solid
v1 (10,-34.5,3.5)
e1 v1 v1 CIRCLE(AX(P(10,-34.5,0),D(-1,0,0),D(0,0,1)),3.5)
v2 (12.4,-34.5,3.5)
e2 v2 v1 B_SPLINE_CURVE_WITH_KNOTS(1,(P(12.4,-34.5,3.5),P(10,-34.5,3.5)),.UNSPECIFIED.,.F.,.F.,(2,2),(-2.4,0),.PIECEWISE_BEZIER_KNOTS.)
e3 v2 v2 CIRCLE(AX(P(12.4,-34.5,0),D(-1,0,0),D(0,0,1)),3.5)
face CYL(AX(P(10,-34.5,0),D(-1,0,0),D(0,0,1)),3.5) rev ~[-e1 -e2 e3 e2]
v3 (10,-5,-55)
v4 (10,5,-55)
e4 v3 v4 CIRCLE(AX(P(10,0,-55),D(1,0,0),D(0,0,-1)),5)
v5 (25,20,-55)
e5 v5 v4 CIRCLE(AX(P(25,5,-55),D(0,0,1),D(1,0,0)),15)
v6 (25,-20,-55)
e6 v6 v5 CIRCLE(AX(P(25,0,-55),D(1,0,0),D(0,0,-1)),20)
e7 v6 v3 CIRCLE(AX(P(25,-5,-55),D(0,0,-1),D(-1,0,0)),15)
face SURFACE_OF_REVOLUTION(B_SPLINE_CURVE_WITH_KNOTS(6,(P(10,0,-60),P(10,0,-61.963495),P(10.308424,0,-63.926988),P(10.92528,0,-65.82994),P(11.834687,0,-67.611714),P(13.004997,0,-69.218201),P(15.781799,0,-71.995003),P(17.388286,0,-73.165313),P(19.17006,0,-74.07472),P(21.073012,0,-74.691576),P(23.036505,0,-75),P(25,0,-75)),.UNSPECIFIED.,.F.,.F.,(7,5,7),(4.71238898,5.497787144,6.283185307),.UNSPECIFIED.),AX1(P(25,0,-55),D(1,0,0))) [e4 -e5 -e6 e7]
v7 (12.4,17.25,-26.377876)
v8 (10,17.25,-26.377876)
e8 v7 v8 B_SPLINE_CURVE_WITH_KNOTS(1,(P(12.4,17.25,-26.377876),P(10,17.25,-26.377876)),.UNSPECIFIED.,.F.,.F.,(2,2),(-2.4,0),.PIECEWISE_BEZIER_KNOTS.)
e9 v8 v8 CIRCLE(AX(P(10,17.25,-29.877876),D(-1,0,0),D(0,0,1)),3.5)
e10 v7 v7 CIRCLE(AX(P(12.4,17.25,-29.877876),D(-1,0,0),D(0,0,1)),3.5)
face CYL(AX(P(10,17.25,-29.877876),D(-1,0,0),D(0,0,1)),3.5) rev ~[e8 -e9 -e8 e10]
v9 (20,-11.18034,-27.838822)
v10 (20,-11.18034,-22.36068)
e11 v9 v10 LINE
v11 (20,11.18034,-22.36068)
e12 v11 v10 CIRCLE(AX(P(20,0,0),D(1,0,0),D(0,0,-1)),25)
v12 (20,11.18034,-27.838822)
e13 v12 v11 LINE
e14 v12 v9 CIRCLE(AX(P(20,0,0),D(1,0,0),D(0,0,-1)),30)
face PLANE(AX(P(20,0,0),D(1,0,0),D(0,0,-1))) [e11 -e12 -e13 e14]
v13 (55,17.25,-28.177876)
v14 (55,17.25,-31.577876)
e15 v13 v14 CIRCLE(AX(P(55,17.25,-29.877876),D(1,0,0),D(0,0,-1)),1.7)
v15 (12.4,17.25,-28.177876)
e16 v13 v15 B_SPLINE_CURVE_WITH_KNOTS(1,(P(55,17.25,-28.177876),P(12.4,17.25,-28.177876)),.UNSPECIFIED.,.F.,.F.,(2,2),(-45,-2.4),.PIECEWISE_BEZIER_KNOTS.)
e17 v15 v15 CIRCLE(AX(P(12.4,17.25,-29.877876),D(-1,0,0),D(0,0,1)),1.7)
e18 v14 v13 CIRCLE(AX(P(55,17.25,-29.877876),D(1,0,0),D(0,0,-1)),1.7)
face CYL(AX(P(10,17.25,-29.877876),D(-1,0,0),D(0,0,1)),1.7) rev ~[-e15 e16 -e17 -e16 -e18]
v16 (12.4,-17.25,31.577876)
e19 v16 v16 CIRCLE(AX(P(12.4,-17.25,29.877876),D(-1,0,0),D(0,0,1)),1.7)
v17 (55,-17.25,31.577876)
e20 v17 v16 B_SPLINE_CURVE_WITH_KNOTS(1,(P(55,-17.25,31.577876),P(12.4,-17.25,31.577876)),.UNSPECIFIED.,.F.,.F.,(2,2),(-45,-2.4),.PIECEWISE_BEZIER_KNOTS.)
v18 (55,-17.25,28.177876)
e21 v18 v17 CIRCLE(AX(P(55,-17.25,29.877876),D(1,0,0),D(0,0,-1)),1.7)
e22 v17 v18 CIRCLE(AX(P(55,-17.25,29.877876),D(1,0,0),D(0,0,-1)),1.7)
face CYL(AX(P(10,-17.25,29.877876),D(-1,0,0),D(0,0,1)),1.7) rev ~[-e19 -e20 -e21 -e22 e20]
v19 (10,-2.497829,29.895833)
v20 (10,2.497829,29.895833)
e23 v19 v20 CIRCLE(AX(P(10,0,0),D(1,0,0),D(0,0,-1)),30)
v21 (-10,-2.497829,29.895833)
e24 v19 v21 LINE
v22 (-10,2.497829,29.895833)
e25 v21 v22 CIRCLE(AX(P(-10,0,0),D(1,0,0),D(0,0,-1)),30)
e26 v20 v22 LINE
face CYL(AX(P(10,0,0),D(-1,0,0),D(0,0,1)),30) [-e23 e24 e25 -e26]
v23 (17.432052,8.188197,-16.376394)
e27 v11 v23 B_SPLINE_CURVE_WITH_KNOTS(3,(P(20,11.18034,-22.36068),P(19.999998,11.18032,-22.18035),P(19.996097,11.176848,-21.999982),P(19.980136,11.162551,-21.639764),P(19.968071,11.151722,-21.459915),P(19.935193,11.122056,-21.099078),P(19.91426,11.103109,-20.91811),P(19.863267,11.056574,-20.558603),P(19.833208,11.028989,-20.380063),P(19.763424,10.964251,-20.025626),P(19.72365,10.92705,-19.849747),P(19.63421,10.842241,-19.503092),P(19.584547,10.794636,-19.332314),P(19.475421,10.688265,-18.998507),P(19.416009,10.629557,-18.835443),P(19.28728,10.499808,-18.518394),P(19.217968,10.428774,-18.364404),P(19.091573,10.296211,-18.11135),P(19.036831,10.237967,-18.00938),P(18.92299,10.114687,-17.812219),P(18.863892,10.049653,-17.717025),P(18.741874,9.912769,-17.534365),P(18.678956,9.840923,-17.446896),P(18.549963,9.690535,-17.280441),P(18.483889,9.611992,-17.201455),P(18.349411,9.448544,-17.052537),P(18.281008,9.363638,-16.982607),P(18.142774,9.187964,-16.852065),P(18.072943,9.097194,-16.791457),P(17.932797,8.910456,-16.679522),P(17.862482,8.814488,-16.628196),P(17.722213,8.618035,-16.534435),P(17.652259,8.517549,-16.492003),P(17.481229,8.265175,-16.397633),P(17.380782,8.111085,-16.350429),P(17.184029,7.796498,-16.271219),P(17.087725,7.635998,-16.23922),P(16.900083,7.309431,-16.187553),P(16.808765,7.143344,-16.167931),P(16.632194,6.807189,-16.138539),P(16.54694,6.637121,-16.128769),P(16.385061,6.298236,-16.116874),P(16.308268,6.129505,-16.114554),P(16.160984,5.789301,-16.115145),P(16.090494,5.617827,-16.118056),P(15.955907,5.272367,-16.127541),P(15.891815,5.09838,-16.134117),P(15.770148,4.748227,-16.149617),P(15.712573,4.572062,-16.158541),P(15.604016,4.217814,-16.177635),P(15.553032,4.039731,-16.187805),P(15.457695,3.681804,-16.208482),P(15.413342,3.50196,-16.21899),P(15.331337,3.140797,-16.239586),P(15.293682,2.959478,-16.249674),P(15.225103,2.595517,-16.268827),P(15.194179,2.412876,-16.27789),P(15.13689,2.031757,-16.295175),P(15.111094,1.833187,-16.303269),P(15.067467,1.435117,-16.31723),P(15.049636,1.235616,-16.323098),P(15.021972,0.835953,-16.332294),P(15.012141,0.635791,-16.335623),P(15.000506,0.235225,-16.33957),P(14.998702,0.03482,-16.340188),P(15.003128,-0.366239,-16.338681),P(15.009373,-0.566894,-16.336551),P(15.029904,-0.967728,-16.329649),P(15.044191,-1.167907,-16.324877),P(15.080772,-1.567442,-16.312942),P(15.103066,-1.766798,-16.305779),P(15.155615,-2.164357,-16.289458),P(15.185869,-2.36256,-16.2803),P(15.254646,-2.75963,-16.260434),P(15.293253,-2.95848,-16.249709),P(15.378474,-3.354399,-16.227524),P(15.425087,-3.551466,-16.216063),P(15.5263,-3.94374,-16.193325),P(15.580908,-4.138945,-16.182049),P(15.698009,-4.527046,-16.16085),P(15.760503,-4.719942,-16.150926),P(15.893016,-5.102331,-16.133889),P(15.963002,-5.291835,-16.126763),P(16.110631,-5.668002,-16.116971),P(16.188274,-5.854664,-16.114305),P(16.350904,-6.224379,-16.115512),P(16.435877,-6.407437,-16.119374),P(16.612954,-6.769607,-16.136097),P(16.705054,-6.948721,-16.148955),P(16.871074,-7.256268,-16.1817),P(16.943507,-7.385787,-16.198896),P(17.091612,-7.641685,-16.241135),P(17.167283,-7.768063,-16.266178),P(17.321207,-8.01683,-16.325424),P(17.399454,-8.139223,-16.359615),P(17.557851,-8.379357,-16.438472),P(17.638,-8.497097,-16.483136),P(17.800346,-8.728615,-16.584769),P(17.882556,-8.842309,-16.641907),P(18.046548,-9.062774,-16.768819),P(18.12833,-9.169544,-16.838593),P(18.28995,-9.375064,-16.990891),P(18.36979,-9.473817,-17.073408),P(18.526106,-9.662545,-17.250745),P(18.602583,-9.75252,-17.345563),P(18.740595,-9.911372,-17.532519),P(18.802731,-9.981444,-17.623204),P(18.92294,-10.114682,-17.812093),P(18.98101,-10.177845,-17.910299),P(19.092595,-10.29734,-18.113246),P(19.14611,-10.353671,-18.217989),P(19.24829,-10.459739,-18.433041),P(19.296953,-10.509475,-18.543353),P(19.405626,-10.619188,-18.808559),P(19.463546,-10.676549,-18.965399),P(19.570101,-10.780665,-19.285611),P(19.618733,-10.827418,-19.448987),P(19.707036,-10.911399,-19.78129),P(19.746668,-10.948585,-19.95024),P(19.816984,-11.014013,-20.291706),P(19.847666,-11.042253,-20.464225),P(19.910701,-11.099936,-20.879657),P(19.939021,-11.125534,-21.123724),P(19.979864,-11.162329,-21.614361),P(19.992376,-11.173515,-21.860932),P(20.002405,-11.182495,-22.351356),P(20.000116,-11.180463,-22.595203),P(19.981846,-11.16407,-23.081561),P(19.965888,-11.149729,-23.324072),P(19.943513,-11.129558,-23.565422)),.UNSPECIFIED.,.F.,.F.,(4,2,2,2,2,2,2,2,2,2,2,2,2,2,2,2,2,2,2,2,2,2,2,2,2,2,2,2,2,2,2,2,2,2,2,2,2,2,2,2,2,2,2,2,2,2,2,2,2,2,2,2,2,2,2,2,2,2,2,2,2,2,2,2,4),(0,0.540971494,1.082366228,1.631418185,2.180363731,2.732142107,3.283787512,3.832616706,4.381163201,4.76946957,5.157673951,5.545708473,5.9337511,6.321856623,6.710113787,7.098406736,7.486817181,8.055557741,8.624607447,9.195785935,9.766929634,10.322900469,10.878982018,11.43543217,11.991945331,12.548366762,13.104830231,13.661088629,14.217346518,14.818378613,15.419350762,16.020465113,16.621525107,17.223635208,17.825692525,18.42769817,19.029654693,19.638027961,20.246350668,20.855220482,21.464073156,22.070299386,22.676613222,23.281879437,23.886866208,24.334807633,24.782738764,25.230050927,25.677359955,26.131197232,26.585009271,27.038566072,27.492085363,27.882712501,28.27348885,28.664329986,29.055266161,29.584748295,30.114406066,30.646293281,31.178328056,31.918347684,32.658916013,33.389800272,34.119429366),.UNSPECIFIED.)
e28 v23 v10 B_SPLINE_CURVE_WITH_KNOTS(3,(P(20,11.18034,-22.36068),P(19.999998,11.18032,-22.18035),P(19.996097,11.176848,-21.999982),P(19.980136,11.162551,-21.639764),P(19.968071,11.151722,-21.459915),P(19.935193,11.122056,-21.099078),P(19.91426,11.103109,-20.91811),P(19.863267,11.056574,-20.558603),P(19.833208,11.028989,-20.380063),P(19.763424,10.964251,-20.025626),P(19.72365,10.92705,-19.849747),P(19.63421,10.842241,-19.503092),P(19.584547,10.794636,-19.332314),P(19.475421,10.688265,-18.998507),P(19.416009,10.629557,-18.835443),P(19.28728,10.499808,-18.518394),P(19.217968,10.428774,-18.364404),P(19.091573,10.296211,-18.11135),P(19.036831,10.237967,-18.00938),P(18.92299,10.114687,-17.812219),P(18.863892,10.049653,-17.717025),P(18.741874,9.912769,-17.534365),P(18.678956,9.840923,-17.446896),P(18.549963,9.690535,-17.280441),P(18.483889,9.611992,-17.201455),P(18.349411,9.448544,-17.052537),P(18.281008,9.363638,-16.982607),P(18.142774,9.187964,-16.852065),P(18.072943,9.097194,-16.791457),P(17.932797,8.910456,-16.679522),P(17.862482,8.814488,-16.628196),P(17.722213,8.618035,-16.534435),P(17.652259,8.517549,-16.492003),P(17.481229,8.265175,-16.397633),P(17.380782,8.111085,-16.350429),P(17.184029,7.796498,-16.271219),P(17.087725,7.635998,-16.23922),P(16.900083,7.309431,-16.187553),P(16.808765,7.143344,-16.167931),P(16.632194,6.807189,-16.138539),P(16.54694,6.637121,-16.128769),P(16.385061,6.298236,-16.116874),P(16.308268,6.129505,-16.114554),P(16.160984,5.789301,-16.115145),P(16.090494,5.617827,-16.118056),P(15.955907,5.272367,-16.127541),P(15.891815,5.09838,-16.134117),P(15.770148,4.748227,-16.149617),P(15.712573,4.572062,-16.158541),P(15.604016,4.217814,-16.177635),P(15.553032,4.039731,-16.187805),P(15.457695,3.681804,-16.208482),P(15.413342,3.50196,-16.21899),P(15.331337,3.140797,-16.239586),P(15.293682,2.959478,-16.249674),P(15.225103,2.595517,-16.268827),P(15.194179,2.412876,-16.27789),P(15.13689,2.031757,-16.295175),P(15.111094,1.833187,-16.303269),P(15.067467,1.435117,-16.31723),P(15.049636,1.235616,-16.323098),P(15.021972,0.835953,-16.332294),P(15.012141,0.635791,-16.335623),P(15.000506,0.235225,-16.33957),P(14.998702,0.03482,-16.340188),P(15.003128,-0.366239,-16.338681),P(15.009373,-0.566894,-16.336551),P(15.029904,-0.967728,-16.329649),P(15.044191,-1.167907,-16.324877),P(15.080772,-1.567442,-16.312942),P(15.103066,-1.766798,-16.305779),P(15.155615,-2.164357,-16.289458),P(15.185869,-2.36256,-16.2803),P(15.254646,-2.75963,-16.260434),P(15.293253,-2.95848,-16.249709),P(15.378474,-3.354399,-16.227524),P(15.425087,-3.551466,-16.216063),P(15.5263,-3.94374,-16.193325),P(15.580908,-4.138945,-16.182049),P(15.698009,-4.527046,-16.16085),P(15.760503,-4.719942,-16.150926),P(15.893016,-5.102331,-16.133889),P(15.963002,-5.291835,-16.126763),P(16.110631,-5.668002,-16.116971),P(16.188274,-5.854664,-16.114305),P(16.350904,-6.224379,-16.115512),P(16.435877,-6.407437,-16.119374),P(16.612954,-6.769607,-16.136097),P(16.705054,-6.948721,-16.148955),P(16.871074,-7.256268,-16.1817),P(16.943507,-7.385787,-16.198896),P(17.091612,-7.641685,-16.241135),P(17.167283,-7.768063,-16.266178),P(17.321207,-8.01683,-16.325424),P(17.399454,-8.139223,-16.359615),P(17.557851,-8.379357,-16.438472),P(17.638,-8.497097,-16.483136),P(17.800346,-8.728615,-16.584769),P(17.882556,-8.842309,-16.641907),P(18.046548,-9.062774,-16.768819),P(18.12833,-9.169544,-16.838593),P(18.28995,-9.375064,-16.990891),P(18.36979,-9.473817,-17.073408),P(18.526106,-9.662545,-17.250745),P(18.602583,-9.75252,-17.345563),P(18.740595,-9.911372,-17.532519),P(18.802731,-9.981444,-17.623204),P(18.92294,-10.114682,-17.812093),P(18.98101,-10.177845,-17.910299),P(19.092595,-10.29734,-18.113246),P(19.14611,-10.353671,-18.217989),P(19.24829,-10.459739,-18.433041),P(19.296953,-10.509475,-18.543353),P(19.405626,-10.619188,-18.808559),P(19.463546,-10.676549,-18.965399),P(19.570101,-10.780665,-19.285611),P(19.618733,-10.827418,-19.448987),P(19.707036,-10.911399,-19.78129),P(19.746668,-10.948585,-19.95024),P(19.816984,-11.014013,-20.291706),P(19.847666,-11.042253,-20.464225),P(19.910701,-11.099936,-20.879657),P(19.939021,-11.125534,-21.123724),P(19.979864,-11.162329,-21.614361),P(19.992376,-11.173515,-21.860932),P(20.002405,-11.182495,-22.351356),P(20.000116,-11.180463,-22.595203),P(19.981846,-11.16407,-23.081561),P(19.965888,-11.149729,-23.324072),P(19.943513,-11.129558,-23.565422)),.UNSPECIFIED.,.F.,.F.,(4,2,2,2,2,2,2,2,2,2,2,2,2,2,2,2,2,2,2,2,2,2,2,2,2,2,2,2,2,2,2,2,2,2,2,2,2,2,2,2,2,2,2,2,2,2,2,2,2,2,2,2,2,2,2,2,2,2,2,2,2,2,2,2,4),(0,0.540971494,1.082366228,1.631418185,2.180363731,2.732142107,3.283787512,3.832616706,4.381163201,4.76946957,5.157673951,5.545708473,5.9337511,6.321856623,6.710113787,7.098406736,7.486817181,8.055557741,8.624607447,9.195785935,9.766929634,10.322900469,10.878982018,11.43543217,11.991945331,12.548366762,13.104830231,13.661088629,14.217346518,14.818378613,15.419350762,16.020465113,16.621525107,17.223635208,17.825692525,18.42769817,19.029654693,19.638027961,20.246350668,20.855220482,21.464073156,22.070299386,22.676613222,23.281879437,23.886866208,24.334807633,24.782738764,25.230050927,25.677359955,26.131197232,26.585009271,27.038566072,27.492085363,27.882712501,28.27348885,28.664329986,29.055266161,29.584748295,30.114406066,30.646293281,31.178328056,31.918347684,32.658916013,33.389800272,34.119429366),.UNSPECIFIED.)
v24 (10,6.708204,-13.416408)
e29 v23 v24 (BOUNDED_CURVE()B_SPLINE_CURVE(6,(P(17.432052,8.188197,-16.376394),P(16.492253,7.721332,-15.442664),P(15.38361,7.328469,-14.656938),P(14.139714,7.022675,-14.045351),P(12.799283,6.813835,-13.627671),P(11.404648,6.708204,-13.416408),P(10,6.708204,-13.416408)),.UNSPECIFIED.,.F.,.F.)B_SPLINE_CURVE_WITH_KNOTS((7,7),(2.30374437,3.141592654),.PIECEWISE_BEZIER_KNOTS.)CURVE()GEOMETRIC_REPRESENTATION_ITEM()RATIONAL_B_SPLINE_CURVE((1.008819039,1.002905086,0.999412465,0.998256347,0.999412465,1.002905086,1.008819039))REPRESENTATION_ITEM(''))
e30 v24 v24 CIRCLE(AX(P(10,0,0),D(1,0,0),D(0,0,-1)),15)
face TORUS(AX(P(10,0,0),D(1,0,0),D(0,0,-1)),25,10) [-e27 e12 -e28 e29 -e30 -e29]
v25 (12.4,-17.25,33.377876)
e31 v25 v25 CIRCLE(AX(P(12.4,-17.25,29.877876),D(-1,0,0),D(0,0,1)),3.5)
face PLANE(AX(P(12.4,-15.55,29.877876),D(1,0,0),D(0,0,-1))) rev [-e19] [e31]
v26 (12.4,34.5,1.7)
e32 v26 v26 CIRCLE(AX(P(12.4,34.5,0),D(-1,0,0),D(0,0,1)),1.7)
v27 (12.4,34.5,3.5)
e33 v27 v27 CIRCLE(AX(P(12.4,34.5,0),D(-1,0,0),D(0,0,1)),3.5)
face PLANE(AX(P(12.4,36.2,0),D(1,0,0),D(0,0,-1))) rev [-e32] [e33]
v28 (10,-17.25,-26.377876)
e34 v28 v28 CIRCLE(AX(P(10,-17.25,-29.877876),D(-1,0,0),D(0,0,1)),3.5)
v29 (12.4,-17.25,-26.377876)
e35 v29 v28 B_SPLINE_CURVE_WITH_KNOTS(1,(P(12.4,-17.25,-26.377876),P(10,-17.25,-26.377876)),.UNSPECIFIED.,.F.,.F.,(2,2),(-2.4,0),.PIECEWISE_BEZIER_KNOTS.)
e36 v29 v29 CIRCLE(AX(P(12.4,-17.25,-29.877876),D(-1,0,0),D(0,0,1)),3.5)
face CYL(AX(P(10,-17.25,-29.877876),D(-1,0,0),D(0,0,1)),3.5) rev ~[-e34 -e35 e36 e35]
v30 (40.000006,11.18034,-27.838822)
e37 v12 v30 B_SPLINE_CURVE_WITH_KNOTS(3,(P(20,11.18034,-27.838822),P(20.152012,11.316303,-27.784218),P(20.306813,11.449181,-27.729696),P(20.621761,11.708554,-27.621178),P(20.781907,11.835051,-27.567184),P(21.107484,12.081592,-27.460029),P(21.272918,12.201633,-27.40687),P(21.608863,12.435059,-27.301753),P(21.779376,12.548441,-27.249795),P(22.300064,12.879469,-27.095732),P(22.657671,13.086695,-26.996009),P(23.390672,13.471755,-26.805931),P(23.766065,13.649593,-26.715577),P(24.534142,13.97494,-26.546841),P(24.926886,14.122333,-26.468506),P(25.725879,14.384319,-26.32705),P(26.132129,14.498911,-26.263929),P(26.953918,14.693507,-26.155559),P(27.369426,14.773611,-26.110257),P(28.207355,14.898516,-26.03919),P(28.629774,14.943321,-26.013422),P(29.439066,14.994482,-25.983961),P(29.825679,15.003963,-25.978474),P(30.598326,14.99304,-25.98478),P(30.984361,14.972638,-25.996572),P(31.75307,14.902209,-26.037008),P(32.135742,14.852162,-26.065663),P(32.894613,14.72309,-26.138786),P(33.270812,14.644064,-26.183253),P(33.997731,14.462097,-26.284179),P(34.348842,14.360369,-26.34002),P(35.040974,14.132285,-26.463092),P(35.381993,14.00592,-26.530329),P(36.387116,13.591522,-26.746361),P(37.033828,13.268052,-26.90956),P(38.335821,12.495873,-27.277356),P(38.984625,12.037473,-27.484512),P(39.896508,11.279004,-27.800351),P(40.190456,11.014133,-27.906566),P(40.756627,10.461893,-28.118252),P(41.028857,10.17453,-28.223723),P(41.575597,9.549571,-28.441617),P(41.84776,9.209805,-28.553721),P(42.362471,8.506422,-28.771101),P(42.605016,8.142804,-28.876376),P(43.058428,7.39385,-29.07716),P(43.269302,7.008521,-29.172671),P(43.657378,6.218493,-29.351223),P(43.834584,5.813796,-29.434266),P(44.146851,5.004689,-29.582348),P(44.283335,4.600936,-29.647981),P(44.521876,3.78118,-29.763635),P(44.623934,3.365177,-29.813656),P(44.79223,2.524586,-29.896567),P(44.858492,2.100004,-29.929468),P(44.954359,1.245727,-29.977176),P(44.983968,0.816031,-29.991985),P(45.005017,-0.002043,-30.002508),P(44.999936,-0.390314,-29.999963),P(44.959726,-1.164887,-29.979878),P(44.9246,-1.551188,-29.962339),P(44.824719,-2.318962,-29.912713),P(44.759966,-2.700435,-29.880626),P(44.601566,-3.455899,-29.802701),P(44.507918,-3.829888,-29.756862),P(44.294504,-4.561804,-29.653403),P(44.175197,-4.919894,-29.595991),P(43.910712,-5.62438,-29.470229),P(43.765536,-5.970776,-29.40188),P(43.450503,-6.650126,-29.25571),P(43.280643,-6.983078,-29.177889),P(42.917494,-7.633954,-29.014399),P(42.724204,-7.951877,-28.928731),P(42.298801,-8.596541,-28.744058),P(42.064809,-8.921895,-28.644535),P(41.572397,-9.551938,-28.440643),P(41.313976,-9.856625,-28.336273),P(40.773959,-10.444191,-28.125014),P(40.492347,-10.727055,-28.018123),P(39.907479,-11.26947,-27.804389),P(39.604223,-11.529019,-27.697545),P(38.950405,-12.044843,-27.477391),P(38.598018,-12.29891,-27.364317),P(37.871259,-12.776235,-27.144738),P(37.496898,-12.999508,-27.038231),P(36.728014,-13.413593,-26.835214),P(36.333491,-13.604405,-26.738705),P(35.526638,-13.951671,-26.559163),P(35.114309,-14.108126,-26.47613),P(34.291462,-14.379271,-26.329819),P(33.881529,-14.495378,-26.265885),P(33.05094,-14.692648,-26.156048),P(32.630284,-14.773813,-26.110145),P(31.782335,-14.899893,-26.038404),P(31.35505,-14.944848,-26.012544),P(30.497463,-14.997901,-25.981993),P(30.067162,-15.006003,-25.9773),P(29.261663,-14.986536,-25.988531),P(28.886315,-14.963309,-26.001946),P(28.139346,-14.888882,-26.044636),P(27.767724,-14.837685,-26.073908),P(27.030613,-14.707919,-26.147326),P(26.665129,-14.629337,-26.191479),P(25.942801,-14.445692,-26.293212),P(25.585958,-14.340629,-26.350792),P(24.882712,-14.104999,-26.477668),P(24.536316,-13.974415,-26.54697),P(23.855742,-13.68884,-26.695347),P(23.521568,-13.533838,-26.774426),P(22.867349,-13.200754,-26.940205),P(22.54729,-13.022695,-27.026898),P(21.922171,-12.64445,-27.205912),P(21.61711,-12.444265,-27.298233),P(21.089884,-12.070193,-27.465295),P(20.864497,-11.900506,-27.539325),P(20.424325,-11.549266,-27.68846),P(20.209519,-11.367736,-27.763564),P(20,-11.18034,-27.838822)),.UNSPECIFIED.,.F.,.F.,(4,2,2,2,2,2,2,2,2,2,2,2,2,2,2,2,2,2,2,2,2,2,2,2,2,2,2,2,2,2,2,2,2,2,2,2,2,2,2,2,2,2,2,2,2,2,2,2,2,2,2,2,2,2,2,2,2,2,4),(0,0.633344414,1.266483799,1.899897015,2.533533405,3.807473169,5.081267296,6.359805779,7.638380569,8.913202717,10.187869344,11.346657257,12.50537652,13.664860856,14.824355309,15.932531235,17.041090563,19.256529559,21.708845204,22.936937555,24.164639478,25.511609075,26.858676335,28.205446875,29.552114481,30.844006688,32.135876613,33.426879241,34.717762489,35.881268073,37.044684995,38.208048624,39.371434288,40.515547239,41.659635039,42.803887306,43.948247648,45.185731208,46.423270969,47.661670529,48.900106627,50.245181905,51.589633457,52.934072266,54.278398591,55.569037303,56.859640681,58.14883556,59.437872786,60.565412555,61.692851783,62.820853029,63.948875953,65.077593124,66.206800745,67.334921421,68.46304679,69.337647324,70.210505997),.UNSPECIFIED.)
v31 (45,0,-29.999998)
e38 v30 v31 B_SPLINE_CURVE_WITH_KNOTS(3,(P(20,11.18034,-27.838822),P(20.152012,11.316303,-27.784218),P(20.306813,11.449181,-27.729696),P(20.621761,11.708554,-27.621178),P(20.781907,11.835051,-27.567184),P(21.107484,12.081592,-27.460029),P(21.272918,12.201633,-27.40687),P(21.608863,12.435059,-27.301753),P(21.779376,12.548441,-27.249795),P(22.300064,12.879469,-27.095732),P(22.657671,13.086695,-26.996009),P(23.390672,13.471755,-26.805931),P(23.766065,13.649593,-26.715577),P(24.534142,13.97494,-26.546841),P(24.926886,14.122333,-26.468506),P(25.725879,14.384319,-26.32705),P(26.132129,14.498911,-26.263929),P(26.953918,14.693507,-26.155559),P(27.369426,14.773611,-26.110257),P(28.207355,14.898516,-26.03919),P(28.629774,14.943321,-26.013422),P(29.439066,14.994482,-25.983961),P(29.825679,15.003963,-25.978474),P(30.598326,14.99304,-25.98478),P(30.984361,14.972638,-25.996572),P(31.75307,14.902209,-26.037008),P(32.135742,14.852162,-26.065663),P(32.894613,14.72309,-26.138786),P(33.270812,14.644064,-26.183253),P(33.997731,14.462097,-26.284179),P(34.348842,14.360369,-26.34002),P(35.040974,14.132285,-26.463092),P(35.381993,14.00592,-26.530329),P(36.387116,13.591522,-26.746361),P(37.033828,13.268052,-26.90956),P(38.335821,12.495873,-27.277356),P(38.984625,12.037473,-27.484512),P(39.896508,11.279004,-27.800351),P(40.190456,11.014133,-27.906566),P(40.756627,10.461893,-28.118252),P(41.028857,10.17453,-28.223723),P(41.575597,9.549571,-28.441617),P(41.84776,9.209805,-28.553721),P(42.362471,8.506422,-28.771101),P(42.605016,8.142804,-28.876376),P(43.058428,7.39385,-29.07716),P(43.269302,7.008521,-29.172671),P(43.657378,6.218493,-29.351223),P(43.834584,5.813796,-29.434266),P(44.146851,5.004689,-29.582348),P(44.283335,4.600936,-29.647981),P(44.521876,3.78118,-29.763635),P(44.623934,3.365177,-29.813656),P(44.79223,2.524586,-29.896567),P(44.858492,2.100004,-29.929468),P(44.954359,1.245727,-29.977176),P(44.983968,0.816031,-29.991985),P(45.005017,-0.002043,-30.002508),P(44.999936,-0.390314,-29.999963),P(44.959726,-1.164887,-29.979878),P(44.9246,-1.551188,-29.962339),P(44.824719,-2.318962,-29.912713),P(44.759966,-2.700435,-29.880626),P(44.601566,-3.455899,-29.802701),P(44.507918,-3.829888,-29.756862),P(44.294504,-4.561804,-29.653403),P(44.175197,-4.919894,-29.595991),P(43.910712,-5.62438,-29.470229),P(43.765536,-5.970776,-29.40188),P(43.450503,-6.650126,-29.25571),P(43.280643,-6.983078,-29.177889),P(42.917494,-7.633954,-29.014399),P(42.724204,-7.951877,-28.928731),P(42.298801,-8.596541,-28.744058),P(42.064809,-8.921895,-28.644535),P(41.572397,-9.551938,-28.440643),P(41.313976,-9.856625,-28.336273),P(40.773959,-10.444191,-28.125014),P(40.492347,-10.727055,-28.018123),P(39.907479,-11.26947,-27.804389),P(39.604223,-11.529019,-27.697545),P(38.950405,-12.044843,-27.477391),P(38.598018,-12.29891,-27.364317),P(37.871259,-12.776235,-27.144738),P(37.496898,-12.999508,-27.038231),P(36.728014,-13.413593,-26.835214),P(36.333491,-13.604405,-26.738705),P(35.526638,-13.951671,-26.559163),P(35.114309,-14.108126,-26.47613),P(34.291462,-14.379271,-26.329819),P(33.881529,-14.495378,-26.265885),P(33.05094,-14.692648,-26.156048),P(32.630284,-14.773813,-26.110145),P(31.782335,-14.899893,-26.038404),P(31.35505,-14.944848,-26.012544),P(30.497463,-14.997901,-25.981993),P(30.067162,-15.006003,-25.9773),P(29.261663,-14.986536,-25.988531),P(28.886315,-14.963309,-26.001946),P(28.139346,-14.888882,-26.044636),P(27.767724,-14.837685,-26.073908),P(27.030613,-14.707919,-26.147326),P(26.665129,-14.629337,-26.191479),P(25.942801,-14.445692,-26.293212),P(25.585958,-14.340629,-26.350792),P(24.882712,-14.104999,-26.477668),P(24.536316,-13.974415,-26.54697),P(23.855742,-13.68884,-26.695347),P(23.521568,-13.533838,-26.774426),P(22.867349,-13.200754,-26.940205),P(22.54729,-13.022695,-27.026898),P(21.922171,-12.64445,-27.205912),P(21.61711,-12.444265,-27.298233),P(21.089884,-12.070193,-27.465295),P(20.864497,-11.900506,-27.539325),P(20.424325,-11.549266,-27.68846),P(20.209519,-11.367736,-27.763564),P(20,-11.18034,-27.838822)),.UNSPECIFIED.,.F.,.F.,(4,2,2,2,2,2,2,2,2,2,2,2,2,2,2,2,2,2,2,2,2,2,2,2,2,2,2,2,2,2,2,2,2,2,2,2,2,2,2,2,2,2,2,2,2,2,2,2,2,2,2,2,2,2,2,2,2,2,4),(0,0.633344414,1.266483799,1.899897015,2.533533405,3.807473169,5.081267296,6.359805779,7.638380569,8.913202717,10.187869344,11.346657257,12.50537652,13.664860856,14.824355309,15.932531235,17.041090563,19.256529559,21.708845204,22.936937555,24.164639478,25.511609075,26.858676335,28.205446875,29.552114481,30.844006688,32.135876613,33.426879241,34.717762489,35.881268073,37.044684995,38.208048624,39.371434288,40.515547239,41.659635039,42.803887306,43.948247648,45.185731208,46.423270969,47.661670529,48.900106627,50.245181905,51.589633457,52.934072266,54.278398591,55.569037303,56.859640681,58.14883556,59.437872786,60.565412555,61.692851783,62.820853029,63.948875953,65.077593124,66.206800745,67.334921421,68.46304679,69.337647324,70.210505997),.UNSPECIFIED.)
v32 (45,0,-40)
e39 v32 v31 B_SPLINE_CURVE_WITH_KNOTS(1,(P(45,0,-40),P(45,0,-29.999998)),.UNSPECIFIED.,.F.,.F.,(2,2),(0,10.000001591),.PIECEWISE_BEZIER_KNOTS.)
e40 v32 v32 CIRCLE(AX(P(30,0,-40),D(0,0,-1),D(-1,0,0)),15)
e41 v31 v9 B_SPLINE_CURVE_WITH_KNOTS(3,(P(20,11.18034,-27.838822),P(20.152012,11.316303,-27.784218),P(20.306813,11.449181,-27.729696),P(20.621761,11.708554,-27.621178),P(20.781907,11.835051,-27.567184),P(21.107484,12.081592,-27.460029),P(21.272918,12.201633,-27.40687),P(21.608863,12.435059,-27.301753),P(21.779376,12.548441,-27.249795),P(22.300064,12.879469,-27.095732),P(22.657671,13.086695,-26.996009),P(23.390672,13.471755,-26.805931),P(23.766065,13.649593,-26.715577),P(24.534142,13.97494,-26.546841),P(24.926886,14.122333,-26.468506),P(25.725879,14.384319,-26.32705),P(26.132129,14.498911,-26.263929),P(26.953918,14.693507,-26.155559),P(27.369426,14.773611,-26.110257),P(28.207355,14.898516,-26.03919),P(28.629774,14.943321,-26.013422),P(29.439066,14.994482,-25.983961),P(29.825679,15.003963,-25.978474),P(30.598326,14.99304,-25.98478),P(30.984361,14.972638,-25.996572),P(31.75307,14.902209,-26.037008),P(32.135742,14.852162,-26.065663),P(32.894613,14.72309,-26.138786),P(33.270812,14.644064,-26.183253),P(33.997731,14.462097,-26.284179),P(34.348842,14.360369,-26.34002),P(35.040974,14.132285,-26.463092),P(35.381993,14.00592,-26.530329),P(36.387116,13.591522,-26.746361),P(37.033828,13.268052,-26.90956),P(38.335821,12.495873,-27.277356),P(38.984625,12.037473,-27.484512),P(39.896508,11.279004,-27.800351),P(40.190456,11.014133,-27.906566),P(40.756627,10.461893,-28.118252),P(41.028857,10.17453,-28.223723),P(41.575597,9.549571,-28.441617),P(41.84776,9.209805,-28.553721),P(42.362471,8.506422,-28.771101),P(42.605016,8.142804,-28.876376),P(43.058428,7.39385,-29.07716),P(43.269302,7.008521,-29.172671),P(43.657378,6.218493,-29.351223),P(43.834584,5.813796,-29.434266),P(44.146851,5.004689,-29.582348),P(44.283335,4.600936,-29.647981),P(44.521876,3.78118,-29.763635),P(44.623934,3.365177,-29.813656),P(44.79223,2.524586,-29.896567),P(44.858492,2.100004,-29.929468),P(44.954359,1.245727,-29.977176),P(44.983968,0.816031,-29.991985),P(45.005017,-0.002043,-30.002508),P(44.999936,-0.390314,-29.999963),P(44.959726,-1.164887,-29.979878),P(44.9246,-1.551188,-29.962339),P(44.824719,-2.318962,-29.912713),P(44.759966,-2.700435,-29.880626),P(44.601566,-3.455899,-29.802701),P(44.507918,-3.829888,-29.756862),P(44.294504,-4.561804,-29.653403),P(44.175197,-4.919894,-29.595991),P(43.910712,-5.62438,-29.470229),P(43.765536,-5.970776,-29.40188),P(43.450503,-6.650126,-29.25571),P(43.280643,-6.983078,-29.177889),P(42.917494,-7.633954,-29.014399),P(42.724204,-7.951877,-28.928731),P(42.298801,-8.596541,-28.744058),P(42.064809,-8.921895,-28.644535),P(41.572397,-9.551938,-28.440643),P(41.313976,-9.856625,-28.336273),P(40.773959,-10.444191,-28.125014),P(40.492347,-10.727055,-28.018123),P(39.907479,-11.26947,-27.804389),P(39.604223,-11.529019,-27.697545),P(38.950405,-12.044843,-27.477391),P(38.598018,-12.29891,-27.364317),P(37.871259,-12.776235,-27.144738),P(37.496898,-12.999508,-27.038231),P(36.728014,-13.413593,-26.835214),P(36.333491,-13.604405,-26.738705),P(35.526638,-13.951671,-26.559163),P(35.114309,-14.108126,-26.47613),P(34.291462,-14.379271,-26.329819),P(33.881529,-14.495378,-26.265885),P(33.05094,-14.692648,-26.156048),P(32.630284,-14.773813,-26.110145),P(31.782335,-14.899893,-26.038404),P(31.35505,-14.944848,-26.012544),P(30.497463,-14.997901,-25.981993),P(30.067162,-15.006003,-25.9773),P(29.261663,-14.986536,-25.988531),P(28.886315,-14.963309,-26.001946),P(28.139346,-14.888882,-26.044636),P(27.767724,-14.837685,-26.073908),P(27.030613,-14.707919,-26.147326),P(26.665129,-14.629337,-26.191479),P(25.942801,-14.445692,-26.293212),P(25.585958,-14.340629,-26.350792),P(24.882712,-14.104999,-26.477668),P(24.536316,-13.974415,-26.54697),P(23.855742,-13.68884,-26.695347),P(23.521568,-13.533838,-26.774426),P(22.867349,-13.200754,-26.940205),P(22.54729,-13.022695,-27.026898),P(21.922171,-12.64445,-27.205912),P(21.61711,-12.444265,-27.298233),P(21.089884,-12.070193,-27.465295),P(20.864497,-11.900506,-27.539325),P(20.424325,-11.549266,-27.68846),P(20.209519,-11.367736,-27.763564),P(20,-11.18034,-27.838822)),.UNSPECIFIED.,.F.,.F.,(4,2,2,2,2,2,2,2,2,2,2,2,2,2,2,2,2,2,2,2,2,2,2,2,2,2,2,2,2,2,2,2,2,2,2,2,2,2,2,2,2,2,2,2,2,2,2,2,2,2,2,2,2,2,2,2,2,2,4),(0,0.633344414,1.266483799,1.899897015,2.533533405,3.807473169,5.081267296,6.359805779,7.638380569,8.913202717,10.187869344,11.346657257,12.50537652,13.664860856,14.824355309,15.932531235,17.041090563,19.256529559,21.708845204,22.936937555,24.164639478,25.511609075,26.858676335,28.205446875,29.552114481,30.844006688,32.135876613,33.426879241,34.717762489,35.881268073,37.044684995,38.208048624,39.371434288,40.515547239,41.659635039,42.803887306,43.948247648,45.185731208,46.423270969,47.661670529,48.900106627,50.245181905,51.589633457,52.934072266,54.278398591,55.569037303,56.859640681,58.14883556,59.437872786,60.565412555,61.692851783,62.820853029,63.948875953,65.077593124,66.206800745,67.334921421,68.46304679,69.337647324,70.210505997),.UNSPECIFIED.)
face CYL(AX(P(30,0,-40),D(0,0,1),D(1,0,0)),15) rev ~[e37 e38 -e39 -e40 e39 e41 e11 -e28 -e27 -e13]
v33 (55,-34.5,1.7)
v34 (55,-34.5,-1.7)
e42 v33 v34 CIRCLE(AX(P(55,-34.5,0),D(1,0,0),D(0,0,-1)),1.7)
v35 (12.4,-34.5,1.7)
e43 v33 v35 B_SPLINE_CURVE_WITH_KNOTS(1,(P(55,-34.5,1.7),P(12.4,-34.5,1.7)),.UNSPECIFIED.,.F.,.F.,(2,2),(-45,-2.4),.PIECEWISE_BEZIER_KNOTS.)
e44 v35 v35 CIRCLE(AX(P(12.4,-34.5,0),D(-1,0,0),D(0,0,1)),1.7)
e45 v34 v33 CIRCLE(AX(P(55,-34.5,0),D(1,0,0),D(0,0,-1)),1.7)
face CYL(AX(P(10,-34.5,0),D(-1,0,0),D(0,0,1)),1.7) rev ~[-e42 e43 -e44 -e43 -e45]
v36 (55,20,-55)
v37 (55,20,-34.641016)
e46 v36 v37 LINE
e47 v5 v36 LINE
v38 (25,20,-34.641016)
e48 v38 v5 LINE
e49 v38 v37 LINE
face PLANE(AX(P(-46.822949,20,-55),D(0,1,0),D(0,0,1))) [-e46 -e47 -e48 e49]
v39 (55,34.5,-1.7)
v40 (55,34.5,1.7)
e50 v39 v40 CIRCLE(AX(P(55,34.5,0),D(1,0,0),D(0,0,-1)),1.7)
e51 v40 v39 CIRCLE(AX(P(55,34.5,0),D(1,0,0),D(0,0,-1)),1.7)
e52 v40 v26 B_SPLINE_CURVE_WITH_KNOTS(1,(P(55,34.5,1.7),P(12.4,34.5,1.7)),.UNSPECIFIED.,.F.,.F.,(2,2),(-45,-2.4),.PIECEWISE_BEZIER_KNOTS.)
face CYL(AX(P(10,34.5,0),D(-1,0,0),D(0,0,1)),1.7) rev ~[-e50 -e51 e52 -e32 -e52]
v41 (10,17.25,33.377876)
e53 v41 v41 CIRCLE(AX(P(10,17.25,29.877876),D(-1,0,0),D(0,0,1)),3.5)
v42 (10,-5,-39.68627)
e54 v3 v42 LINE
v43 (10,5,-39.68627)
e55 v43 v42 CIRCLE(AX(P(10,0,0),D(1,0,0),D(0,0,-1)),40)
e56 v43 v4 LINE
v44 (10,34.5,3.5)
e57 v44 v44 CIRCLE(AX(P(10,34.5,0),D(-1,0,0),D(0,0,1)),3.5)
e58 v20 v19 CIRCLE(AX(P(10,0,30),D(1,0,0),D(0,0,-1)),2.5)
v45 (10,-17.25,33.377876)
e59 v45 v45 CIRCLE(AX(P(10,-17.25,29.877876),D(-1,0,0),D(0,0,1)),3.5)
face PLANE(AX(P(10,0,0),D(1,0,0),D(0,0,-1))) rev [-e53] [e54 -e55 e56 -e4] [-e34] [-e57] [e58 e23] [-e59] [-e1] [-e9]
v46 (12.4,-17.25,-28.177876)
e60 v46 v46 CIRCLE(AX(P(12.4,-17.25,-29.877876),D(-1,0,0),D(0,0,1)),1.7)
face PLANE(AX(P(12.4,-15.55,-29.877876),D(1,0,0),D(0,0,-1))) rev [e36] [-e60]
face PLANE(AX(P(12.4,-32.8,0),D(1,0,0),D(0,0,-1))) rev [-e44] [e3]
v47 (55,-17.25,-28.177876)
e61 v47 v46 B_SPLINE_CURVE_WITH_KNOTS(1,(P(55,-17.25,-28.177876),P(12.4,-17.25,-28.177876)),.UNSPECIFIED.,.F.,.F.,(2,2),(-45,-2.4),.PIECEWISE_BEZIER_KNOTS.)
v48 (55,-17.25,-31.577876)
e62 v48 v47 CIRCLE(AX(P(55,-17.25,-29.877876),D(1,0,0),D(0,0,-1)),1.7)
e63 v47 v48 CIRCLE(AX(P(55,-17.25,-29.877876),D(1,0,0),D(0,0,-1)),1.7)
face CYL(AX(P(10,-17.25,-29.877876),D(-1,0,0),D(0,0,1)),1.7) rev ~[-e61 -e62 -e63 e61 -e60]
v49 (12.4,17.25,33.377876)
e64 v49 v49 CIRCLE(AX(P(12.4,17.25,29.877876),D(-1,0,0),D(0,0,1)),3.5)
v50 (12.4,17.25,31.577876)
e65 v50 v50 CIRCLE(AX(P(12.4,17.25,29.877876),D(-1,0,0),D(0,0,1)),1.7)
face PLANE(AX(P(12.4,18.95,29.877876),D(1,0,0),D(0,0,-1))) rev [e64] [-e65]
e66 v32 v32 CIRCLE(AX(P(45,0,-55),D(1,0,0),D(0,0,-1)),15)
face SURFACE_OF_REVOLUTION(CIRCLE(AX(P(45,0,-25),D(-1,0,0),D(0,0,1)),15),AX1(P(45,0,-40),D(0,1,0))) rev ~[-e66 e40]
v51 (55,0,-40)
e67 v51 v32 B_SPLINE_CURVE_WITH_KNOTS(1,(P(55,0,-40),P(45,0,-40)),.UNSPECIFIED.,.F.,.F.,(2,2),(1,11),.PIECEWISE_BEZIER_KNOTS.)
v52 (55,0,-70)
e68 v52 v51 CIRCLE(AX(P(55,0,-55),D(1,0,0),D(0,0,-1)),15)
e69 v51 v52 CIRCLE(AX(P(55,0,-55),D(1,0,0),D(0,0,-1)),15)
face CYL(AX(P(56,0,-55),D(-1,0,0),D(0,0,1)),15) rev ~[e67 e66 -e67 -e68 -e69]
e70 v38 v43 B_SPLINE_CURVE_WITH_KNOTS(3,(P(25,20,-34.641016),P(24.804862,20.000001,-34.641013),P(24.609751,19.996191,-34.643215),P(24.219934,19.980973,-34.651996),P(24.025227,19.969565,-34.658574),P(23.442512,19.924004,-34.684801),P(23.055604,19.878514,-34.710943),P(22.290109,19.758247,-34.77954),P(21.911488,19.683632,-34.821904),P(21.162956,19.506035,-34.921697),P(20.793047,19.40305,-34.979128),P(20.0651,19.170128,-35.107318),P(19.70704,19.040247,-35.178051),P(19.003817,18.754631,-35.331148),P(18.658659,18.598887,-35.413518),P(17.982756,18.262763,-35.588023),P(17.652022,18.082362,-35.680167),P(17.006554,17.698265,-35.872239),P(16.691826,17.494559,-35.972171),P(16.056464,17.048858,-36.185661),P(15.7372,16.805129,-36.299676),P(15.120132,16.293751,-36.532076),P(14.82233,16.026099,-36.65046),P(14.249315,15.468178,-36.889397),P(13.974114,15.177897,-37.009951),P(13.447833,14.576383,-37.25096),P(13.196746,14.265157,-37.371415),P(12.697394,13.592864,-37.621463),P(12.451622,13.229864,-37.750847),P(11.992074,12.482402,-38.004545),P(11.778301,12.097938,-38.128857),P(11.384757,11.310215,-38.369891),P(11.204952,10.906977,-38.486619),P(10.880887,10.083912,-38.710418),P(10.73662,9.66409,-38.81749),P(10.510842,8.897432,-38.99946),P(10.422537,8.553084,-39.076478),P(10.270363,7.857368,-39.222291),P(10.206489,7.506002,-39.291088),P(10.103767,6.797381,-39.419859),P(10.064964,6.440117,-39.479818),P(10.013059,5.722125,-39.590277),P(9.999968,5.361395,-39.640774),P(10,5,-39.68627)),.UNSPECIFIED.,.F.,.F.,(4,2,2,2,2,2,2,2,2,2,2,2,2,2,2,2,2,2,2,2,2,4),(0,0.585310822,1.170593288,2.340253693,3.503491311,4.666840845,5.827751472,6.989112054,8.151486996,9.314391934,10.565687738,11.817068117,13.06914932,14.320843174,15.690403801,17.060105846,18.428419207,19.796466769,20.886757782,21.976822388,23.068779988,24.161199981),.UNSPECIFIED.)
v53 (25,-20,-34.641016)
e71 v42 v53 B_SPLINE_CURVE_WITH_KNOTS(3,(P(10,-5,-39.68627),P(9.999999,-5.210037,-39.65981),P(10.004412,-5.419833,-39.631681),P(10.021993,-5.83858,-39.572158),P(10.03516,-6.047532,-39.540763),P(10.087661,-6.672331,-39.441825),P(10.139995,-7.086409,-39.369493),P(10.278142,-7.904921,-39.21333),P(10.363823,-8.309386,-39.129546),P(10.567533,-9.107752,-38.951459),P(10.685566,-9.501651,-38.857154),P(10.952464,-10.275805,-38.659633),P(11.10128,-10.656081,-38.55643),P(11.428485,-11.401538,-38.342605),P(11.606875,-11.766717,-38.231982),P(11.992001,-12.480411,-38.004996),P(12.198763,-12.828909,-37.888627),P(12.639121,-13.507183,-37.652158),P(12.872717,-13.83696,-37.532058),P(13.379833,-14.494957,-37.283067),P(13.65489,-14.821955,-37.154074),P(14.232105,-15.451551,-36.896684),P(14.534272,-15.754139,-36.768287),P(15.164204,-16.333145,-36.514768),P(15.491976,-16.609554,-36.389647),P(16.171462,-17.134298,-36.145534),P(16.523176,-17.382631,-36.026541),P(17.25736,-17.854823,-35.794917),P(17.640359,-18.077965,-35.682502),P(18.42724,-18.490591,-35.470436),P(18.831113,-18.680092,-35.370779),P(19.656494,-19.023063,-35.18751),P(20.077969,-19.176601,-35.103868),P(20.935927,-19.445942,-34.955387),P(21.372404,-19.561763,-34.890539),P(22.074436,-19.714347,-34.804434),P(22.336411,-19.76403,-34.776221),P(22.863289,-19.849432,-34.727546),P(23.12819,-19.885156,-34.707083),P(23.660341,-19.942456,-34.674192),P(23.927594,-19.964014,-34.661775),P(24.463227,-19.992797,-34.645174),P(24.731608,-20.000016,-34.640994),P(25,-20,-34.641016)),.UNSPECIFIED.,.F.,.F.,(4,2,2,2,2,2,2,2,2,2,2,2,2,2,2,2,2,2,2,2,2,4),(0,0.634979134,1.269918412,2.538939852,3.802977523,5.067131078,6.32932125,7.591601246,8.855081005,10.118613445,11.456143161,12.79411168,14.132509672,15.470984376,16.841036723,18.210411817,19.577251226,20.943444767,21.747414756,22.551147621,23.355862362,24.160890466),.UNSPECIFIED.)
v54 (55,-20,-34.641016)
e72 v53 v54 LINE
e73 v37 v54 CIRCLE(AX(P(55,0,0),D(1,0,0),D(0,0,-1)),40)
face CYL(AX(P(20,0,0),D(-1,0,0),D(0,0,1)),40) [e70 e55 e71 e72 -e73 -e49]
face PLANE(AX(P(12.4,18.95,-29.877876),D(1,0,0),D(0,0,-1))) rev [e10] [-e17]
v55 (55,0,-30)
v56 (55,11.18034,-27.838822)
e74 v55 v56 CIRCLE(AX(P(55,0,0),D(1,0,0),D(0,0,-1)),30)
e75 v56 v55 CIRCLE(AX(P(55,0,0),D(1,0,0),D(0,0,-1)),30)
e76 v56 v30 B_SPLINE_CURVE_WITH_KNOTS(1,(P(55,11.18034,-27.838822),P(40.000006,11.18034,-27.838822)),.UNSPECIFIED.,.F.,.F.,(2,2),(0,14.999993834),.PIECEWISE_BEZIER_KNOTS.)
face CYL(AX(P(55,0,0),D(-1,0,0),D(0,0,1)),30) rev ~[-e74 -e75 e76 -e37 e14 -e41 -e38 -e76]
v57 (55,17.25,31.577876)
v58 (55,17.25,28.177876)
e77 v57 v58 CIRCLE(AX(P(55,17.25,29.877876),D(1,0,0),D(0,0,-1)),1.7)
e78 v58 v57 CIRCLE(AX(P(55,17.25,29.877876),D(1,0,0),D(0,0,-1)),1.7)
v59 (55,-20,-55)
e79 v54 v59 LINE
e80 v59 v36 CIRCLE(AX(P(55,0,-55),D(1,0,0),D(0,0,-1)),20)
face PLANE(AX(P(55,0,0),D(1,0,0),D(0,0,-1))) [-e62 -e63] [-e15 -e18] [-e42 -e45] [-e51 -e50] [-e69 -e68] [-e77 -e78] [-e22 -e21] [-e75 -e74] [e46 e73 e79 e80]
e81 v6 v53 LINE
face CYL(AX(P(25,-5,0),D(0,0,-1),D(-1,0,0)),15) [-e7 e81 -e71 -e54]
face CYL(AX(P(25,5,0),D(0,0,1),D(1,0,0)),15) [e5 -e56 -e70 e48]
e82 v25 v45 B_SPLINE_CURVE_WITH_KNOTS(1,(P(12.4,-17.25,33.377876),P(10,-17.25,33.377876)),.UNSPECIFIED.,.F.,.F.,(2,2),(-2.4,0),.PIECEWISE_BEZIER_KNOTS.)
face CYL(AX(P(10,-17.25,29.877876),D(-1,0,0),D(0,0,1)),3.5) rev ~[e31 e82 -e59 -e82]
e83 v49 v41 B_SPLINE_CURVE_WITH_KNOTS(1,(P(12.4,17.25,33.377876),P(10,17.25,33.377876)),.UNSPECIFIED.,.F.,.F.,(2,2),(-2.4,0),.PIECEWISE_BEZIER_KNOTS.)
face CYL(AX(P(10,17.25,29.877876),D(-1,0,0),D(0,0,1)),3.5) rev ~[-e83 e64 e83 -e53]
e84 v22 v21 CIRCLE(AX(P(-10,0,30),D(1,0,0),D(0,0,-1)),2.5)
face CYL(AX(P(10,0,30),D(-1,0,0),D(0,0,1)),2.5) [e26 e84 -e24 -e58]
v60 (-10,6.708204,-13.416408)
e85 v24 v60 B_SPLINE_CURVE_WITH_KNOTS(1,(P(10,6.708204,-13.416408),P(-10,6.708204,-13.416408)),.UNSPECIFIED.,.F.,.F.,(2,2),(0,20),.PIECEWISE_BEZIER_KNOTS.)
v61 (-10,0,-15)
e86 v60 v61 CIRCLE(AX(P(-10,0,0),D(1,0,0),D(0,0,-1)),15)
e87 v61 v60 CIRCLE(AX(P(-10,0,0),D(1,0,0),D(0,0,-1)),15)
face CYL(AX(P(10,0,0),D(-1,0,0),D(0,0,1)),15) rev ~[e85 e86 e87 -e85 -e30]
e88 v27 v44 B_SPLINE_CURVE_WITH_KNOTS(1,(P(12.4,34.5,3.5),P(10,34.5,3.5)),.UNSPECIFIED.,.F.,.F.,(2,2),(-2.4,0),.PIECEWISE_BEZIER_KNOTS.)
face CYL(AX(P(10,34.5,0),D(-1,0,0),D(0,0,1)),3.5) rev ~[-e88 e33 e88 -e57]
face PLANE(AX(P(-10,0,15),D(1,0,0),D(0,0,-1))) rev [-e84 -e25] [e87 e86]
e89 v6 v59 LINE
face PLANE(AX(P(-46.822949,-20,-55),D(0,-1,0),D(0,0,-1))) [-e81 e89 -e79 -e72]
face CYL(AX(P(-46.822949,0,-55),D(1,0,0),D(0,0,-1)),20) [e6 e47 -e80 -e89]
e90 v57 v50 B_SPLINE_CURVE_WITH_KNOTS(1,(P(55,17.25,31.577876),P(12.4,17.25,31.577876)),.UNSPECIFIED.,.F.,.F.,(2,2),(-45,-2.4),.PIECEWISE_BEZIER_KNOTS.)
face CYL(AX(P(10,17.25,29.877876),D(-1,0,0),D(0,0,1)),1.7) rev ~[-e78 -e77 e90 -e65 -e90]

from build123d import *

# Parameters (mm, degrees)
CROQUIS1_R                                           = 15
SALIENTE_EXTRUIR1_DEPTH                              = 10
CROQUIS2_R                                           = 40
CROQUIS2_R_2                                         = 15
SALIENTE_EXTRUIR2_DEPTH                              = 10
CROQUIS3_R                                           = 40
CROQUIS3_R_2                                         = 30
SALIENTE_EXTRUIR3_DEPTH                              = 35
REFRENTADO_PARA_TORNILLO_CON_CABEZA_TRON_D           = 3.4
REFRENTADO_PARA_TORNILLO_CON_CABEZA_TRON_CBORE_D     = 7
REFRENTADO_PARA_TORNILLO_CON_CABEZA_TRON_CBORE_DEPTH = 2.4
SALIENTE_EXTRUIR4_START                              = -45
SALIENTE_EXTRUIR4_DEPTH                              = 45
REDONDEO1_R                                          = 15
CORTAR_BARRER4_PROFILE_R                             = 15


with BuildPart() as part:
    # Croquis1 → Saliente-Extruir1 (new, symmetric)
    with BuildSketch(Plane(origin=(0, 0, 0), x_dir=(0, 0, -1), z_dir=(1, 0, 0))):
        with BuildLine():
            ThreePointArc((-29.895833333, -2.497828918), (30, 0), (-29.895833333, 2.497828918))
            ThreePointArc((-29.895833333, 2.497828918), (-32.5, 0), (-29.895833333, -2.497828918))
        make_face()
        Circle(CROQUIS1_R, mode=Mode.SUBTRACT)
    extrude(amount=SALIENTE_EXTRUIR1_DEPTH, both=True)

    # Croquis2 → Saliente-Extruir2 (add)
    with BuildSketch(Plane(origin=(10, 0, 0), x_dir=(0, 0, -1), z_dir=(1, 0, 0))):
        Circle(CROQUIS2_R)
        Circle(CROQUIS2_R_2, mode=Mode.SUBTRACT)
    extrude(amount=SALIENTE_EXTRUIR2_DEPTH)

    # Croquis3 → Saliente-Extruir3 (add)
    with BuildSketch(Plane(origin=(20, 0, 0), x_dir=(0, 0, -1), z_dir=(1, 0, 0))):
        Circle(CROQUIS3_R)
        Circle(CROQUIS3_R_2, mode=Mode.SUBTRACT)
    extrude(amount=SALIENTE_EXTRUIR3_DEPTH)

    # Refrentado para tornillo con cabeza troncocónica de M31 (through all)
    with Locations(Plane.ZY.offset(-10)):
        with Locations((0, 34.5), (29.877876431, 17.25), (29.877876431, -17.25), (0, -34.5), (-29.877876431, -17.25), (-29.877876431, 17.25)):
            CounterBoreHole(REFRENTADO_PARA_TORNILLO_CON_CABEZA_TRON_D / 2, REFRENTADO_PARA_TORNILLO_CON_CABEZA_TRON_CBORE_D / 2, REFRENTADO_PARA_TORNILLO_CON_CABEZA_TRON_CBORE_DEPTH)

    # Croquis8 → Saliente-Extruir4 (add)
    with BuildSketch(Plane(origin=(55, 0, 0), x_dir=(0, 0, -1), z_dir=(1, 0, 0)).offset(SALIENTE_EXTRUIR4_START)):
        with BuildLine():
            Line((55, 20), (34.641016151, 20))
            ThreePointArc((34.641016151, 20), (40, 0), (34.641016151, -20))
            Line((34.641016151, -20), (55, -20))
            ThreePointArc((55, -20), (75, 0), (55, 20))
        make_face()
    extrude(amount=SALIENTE_EXTRUIR4_DEPTH)

    # Redondeo1
    redondeo1_edges = [part.edges().sort_by_distance(p)[0] for p in [
        (10, 0, -75),
        (10, -20, -44.820508076),
        (10, 20, -44.820508076),
    ]]
    fillet(redondeo1_edges, radius=REDONDEO1_R)

    # Cortar-Barrer4: sweep along a path in Croquis17
    with BuildLine(Plane(origin=(0, 0, 0), x_dir=(1, 0, 0), z_dir=(0, 1, 0))) as cortar_barrer4_path:
        Line((55, 55), (45, 55))
        ThreePointArc((45, 55), (34.393398282, 50.606601718), (30, 40))
        Line((30, 40), (30, 0))
    # Cortar-Barrer4 profile (on start of the path) → Cortar-Barrer4 (sweep, cut)
    with BuildSketch(Plane(origin=(55, 0, -55), x_dir=(0, 0, -1), z_dir=(-1, 0, 0))):
        Circle(CORTAR_BARRER4_PROFILE_R)
    sweep(path=cortar_barrer4_path.line, mode=Mode.SUBTRACT)

    # Redondeo2: read off the stored shape, not the designer's step
    # Redondeo2 outline → Redondeo2 (revolve, cut)
    with BuildSketch(Plane.YX):
        with BuildLine():
            ThreePointArc((15, 10), (17.928933196, 17.071068819), (25.00000285, 20))
            Line((25.00000285, 20), (15, 20))
            Line((15, 20), (15, 10))
        make_face()
    revolve(axis=Axis((0, 0, 0), (1, 0, 0)), mode=Mode.SUBTRACT)


solid = part.part
